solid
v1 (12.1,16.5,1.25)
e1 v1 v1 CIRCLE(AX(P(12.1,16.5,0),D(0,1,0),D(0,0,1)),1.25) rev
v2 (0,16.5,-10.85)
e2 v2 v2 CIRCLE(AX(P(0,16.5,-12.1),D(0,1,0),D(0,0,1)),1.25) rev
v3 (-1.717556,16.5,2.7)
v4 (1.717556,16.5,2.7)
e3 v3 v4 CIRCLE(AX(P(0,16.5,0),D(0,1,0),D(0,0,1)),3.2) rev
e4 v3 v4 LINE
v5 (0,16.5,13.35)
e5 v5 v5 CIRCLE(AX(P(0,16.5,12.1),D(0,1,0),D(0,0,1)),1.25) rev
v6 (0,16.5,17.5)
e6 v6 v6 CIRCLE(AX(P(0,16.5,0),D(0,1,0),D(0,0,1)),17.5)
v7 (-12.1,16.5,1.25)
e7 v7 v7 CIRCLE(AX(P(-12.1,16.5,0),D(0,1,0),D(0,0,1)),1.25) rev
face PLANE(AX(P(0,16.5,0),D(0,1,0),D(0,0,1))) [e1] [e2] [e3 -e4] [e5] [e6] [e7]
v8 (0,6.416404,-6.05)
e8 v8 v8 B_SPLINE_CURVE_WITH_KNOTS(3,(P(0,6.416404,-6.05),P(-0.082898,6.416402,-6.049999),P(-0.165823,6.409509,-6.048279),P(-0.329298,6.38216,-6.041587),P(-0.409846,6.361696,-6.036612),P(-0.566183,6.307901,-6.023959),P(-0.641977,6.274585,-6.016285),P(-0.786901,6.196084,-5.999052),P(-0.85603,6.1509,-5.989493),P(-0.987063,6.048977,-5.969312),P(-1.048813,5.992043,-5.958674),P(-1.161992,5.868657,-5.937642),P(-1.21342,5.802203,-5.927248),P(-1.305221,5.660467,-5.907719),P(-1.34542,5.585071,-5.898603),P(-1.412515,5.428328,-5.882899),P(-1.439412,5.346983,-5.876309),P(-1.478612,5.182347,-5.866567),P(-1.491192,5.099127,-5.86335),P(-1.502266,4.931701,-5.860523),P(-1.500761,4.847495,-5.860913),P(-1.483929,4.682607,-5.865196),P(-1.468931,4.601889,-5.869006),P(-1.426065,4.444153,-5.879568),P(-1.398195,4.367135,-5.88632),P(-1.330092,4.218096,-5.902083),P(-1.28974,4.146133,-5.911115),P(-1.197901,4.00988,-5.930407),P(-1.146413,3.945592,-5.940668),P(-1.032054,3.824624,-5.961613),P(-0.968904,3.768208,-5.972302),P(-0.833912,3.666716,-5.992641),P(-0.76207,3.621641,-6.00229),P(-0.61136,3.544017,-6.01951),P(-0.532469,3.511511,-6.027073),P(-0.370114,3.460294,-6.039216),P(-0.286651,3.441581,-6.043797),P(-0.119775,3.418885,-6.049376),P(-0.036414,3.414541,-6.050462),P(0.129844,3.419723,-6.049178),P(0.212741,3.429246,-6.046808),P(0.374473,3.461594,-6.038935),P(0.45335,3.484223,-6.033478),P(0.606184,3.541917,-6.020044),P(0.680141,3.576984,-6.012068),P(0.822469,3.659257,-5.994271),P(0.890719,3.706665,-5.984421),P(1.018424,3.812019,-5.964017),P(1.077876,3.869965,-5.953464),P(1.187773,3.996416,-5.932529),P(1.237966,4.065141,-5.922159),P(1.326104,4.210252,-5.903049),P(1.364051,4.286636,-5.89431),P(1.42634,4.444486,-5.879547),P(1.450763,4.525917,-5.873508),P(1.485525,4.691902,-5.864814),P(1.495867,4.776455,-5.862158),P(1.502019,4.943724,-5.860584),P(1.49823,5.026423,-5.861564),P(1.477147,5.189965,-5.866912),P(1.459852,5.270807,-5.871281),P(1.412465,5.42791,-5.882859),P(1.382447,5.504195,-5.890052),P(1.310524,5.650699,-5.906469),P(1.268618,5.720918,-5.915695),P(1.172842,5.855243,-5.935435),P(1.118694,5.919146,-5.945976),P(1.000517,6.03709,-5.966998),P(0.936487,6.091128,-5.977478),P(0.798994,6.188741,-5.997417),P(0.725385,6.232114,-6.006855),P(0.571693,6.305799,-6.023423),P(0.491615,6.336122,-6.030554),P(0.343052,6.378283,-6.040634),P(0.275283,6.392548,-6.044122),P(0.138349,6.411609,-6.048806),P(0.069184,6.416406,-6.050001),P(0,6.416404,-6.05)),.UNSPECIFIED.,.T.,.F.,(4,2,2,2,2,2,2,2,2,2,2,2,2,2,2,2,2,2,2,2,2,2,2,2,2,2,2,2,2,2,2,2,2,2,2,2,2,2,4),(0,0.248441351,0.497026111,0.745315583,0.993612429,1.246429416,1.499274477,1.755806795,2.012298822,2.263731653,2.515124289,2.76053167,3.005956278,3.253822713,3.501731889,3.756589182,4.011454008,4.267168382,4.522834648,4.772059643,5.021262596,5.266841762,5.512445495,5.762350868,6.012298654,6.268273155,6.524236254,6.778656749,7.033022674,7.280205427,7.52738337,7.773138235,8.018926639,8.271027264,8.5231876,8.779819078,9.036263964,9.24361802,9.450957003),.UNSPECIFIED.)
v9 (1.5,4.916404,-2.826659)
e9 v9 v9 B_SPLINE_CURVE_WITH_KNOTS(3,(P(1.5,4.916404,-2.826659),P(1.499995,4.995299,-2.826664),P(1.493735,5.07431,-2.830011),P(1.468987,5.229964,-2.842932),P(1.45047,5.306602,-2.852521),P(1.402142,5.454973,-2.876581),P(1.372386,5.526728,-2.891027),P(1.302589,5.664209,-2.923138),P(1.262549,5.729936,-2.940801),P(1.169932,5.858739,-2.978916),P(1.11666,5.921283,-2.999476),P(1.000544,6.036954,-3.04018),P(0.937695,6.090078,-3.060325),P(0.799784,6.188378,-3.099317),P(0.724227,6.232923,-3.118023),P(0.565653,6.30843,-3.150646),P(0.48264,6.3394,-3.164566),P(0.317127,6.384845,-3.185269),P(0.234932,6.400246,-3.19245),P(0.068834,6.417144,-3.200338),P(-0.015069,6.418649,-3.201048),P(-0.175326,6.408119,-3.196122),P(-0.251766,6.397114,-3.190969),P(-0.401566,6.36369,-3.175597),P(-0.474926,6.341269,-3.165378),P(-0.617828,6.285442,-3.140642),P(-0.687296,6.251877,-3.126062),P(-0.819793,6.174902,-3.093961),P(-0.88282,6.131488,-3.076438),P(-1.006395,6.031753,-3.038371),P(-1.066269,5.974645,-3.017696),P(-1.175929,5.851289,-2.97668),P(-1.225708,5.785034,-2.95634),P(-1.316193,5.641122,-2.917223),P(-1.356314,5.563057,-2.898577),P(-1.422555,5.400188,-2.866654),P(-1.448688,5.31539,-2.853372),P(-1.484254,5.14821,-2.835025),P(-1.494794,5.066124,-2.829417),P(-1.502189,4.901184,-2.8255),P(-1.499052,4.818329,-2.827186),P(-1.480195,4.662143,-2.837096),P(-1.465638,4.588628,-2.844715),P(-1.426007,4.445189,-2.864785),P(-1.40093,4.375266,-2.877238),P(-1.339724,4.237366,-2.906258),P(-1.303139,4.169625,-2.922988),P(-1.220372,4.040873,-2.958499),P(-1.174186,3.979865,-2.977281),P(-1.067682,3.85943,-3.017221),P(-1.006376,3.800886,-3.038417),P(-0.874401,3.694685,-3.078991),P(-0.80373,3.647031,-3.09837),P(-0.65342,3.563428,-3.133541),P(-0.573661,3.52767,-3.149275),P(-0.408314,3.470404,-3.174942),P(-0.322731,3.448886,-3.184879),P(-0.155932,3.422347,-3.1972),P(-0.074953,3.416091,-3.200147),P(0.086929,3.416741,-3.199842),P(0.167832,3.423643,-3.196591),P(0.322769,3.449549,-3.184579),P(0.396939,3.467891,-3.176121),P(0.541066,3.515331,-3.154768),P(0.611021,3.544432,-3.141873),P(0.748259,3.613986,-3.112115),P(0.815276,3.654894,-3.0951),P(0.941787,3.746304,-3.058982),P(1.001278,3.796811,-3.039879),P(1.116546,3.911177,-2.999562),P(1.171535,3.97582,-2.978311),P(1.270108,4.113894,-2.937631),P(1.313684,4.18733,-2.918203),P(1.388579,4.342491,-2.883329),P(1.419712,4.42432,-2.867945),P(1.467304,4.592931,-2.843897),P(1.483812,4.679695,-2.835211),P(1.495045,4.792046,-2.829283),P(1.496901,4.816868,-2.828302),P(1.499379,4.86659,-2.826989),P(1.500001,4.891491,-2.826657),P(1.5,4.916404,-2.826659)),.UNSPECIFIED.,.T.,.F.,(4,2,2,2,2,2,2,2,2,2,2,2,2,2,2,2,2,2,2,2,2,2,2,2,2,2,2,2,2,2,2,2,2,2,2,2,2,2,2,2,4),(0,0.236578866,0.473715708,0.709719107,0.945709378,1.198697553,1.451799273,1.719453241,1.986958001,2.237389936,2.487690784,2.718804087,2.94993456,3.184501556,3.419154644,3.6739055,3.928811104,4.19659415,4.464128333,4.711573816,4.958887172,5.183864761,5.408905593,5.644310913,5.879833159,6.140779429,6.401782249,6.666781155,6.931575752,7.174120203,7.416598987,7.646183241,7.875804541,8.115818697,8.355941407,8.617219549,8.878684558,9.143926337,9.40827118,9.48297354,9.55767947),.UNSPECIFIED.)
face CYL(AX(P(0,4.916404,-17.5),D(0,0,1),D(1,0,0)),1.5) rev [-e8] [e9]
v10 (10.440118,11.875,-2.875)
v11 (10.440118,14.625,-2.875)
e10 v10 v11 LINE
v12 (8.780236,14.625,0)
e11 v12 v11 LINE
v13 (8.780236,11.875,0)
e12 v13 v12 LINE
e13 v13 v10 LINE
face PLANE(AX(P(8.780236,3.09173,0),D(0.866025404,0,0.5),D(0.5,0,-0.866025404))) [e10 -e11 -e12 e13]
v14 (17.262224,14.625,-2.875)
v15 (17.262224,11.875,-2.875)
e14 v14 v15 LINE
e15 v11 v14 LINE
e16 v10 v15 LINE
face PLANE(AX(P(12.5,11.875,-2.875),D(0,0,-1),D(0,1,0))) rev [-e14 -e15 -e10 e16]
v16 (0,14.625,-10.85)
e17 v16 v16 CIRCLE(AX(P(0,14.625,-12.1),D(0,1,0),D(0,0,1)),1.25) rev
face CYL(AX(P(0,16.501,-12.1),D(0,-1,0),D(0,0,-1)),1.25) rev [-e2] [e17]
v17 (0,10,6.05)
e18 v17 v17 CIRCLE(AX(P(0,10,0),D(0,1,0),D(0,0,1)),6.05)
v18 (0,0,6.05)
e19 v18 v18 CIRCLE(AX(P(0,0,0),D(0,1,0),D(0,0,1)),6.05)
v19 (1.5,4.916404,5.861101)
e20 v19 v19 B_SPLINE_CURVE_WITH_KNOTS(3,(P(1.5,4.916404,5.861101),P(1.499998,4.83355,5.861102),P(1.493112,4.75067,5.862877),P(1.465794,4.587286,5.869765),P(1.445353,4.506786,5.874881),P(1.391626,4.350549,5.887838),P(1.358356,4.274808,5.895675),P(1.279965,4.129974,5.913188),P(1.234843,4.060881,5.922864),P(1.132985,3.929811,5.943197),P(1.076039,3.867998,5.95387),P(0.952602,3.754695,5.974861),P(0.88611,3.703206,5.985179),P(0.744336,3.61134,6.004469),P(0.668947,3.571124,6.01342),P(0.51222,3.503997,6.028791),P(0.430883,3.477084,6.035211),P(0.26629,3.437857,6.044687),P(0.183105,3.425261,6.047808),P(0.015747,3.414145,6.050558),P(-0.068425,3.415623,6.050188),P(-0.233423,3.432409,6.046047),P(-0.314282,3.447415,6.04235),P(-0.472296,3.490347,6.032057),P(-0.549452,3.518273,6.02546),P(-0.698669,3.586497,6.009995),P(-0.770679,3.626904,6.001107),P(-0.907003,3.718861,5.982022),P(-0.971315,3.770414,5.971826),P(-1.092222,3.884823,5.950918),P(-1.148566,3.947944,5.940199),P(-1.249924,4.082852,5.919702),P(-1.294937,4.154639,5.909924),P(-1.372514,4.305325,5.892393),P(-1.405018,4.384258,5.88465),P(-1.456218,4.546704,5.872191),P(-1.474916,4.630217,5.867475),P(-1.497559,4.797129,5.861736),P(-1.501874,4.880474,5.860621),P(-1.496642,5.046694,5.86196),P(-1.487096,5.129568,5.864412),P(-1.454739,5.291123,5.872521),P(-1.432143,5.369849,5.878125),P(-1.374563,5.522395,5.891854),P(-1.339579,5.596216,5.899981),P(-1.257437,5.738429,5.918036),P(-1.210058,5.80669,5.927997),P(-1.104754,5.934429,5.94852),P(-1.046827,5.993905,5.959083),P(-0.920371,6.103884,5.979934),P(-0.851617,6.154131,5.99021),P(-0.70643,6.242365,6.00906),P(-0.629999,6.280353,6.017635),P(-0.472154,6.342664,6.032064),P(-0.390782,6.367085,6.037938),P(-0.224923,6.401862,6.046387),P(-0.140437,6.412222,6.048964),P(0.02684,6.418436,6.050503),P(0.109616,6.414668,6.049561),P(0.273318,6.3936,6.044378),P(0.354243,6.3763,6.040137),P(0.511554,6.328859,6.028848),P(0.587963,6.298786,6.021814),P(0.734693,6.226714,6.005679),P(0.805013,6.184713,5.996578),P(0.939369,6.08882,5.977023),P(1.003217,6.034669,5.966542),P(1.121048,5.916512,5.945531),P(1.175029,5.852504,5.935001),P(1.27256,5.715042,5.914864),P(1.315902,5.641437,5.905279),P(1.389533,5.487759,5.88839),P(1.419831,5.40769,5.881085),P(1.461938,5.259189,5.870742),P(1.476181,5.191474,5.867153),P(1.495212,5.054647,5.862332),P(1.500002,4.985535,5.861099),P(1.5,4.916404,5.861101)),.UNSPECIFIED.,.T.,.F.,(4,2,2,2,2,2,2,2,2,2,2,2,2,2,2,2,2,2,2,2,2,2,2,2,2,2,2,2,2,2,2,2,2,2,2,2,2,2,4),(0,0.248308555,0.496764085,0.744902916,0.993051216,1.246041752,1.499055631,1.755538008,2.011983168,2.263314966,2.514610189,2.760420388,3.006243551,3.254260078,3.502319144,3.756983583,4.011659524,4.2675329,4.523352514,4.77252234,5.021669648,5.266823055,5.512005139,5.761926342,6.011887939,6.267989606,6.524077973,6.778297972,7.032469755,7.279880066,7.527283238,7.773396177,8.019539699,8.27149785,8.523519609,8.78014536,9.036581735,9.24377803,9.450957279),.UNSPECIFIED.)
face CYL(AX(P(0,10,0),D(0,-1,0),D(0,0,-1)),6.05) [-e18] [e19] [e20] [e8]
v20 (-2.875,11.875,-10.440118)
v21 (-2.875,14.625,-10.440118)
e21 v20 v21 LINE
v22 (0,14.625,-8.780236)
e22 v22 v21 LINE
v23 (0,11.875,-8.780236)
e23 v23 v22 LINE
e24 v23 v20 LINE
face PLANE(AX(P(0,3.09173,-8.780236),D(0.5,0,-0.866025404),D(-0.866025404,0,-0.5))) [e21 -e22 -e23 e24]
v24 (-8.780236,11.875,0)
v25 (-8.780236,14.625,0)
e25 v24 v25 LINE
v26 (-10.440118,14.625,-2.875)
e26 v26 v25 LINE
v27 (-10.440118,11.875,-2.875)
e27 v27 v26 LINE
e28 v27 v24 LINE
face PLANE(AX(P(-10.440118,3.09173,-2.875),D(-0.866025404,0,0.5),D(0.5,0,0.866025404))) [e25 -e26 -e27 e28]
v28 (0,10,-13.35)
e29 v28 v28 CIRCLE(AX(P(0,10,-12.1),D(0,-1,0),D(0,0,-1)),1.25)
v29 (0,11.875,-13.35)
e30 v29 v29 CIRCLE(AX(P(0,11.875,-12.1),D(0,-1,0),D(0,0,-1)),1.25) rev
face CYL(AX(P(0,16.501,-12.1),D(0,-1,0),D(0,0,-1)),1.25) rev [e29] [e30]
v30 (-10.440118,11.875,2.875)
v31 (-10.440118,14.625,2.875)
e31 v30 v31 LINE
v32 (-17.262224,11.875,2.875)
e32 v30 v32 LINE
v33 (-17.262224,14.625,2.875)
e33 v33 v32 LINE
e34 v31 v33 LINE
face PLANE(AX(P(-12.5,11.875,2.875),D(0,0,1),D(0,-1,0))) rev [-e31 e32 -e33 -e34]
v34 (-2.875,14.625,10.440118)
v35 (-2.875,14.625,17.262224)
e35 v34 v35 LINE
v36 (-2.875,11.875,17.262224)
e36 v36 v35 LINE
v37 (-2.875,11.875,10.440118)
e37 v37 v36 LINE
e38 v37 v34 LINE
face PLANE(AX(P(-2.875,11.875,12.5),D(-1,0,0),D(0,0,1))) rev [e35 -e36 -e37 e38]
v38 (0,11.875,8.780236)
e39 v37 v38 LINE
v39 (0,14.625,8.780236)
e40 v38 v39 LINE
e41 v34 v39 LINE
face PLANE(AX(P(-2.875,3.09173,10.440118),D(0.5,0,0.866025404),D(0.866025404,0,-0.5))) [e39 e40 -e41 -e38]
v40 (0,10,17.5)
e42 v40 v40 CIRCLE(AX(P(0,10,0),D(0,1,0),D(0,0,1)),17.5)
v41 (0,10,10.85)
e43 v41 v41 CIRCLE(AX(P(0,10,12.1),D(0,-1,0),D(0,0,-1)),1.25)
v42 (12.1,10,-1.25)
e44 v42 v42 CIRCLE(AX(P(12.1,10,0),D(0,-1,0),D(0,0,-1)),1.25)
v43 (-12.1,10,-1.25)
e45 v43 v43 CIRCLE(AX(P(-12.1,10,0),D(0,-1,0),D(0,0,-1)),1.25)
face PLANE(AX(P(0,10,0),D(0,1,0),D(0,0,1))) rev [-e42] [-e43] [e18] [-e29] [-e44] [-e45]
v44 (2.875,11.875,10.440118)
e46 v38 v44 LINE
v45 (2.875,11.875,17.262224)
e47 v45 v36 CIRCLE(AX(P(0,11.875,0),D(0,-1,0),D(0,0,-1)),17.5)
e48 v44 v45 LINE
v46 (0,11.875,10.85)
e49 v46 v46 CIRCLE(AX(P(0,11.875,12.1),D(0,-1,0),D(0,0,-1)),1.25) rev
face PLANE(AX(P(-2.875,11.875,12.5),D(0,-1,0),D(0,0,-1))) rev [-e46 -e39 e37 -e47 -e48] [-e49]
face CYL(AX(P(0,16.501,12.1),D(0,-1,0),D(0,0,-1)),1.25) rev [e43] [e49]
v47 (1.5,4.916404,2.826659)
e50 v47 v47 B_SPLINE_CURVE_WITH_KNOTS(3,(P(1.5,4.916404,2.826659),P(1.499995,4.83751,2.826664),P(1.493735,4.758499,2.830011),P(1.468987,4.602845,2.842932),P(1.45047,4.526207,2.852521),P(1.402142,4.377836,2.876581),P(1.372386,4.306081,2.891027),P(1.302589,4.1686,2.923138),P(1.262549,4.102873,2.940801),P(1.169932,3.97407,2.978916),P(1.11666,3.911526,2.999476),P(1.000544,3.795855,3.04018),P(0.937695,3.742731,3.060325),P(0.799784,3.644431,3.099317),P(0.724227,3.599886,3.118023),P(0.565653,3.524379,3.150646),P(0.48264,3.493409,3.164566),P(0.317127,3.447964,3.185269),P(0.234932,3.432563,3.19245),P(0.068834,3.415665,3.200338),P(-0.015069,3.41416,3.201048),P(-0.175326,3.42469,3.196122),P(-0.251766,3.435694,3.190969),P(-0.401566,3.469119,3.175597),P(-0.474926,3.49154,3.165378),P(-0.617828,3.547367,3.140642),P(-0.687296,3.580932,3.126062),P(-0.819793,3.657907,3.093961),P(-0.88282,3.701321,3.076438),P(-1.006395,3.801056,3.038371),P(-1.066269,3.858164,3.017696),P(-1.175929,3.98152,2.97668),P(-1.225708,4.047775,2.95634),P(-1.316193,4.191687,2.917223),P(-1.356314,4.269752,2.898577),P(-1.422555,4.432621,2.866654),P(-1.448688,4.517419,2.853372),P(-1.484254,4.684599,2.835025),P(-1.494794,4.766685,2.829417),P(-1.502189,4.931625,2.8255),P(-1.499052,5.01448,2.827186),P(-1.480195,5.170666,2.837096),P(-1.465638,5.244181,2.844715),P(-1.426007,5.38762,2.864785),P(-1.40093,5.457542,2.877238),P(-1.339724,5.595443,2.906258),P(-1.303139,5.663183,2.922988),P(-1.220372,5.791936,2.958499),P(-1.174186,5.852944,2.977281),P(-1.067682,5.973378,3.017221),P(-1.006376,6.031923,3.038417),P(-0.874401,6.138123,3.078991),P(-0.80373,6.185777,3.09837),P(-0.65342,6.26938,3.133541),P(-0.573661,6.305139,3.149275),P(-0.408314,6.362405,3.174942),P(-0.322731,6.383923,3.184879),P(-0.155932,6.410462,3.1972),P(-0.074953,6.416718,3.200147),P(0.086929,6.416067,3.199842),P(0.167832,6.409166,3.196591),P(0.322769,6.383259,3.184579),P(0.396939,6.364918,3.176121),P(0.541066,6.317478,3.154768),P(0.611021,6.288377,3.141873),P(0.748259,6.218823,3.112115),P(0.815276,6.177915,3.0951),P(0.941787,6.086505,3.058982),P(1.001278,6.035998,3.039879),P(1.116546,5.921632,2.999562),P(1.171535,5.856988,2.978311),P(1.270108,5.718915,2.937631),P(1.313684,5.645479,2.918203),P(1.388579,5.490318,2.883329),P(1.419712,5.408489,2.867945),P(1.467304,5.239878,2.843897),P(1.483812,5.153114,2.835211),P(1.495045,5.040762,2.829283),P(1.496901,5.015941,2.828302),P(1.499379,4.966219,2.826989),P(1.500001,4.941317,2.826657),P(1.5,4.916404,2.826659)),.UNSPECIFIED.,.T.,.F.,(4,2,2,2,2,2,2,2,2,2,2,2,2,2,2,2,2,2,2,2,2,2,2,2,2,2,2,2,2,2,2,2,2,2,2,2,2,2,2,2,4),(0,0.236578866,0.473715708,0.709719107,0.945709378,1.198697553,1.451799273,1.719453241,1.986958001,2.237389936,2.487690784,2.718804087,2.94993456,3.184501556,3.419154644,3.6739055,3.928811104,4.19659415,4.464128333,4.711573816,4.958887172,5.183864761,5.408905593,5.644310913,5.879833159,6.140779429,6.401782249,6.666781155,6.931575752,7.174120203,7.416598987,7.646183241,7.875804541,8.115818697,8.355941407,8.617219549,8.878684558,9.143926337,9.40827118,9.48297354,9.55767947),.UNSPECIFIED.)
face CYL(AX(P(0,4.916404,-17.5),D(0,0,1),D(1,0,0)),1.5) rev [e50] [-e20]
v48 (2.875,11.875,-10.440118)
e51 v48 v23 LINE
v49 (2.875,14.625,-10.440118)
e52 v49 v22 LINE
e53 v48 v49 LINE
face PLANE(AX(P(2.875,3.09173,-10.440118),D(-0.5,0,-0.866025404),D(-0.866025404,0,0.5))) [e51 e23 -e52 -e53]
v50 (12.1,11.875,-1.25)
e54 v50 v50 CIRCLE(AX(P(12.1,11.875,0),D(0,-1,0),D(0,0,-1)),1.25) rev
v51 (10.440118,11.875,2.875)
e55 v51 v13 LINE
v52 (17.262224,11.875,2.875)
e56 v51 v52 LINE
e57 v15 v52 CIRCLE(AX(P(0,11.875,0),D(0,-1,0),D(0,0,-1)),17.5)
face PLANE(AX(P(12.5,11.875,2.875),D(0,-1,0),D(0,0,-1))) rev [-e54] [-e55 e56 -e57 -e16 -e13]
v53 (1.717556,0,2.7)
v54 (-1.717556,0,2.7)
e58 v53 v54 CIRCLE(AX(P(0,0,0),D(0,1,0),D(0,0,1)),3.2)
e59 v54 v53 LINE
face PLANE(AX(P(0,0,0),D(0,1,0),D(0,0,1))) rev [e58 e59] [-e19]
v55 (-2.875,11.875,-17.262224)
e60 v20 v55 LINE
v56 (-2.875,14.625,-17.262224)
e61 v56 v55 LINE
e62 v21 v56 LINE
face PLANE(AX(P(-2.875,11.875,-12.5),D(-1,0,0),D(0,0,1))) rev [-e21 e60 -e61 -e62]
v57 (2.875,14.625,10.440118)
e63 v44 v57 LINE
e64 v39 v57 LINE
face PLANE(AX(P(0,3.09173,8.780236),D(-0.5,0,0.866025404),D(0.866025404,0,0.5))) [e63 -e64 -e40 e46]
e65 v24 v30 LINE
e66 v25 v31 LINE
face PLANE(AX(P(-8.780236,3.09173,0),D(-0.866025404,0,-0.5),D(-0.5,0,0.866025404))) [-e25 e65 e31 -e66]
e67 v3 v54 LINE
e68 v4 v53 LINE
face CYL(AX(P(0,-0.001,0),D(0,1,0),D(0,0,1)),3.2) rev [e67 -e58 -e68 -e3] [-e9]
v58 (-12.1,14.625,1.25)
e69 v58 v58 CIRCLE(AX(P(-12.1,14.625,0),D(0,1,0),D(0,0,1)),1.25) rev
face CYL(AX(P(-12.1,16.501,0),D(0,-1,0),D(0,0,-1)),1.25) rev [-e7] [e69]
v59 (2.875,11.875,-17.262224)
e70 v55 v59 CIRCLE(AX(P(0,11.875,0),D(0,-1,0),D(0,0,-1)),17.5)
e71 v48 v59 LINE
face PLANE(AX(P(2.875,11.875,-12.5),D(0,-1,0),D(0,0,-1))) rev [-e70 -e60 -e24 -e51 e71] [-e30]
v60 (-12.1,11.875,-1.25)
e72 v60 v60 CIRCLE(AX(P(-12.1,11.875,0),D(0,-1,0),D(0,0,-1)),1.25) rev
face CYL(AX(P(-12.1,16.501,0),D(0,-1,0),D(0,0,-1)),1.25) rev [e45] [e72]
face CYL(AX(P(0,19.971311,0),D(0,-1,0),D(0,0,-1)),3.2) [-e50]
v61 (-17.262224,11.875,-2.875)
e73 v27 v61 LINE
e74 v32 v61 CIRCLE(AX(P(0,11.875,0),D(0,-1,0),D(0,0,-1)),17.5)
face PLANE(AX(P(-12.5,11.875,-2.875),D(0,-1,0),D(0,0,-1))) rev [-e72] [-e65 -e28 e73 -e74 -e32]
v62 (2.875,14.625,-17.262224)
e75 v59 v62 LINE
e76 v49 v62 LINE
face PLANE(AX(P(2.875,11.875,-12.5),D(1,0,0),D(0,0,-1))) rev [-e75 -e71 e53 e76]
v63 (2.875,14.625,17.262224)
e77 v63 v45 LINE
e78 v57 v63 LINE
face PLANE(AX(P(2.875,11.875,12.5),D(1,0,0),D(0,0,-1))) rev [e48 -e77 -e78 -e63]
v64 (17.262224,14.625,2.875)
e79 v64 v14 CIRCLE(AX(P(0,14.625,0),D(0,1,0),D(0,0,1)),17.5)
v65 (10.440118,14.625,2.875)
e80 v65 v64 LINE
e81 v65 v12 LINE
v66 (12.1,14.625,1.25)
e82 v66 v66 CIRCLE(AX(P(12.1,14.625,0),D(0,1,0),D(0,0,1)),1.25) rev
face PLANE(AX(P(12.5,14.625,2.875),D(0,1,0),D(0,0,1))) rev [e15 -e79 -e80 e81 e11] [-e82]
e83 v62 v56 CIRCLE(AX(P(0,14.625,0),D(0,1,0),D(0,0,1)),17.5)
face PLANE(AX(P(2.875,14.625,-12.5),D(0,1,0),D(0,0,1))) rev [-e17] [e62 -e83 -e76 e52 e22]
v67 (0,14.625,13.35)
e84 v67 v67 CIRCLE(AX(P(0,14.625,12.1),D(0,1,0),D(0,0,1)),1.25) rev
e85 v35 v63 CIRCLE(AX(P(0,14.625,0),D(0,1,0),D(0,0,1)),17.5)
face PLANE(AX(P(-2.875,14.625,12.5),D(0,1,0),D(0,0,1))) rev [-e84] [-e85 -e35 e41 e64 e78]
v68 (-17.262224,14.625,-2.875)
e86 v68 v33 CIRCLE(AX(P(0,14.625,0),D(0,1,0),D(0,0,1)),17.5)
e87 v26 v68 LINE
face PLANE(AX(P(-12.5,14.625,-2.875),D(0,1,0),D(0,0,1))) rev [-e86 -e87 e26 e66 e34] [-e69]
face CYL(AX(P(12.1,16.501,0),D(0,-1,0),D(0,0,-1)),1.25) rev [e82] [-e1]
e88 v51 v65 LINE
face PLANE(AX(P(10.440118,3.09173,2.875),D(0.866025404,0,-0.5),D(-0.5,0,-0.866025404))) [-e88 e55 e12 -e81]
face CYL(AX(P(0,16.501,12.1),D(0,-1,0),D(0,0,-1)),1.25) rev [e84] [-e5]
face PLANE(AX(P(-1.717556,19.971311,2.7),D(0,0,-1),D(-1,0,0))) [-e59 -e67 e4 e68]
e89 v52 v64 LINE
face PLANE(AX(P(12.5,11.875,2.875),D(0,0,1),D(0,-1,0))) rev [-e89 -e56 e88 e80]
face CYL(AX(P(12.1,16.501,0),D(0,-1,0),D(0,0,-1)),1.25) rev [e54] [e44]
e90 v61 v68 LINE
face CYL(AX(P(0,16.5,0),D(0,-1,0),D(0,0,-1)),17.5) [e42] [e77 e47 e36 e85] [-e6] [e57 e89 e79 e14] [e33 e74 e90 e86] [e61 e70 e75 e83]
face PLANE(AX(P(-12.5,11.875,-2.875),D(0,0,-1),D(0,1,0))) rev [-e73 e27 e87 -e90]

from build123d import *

# Parameters (mm, degrees)
SKETCH1_R                      = 6.05
SKETCH1_R_2                    = 3.05
BOSS_EXTRUDE1_DEPTH            = 10
SKETCH2_R                      = 17.5
BOSS_EXTRUDE2_DEPTH            = 6.5
CUT_EXTRUDE1_REACH             = 28.693
SKETCH3_R                      = 1.25
CUT_EXTRUDE2_DEPTH             = 30.744747435
CUT_EXTRUDE2_DEPTH_BACK        = 30.744747435
SKETCH4_R                      = 1.5
CUT_EXTRUDE3_REACH             = 28.693
SKETCH6_R                      = 3.2
CUT_EXTRUDE3_DIRECTION_2_REACH = 28.693
BOSS_EXTRUDE3_DEPTH            = 16.5
SKETCH8_W                      = 5.75
SKETCH8_H                      = 2.75
CUT_EXTRUDE4_DEPTH             = 5
CUT_EXTRUDE5_DEPTH             = 2.75
CIRPATTERN1_START              = 11.875
CIRPATTERN1_OUTLINE_R          = 1.25
CIRPATTERN1_DEPTH              = 2.75


# Read off the part's stored shape, not the designer's step: CirPattern1
with BuildPart() as part:
    # Sketch1 → Boss-Extrude1 (new body)
    with BuildSketch(Plane(origin=(0, 0, 0), x_dir=(1, 0, 0), z_dir=(0, 1, 0))):
        with Locations(Location((0, 0, 0), (0, 0, 270))):
            Circle(SKETCH1_R)
        with Locations(Location((0, 0, 0), (0, 0, 270))):
            Circle(SKETCH1_R_2, mode=Mode.SUBTRACT)
    extrude(amount=BOSS_EXTRUDE1_DEPTH)

    # Sketch2 → Boss-Extrude2 (add)
    with BuildSketch(Plane(origin=(0, 10, 0), x_dir=(1, 0, 0), z_dir=(0, 1, 0))):
        with Locations(Location((0, 0, 0), (0, 0, 90))):
            Circle(SKETCH2_R)
    extrude(amount=BOSS_EXTRUDE2_DEPTH)

    # Sketch3 → Cut-Extrude1 (cut, up to next)
    with BuildSketch(Plane.XZ.offset(-10), mode=Mode.PRIVATE) as cut_extrude1_sk1:
        with Locations(Location((12.1, 0, 0), (0, 0, 270))):
            Circle(SKETCH3_R)
    cut_extrude1_tool1 = extrude(cut_extrude1_sk1.sketch, amount=-CUT_EXTRUDE1_REACH, mode=Mode.PRIVATE) & part.part
    # Sketch3 → Cut-Extrude1 (cut, up to next)
    with BuildSketch(Plane.XZ.offset(-10), mode=Mode.PRIVATE) as cut_extrude1_sk2:
        with Locations(Location((0, -12.1, 0), (0, 0, 270))):
            Circle(SKETCH3_R)
    cut_extrude1_tool2 = extrude(cut_extrude1_sk2.sketch, amount=-CUT_EXTRUDE1_REACH, mode=Mode.PRIVATE) & part.part
    # Sketch3 → Cut-Extrude1 (cut, up to next)
    with BuildSketch(Plane.XZ.offset(-10), mode=Mode.PRIVATE) as cut_extrude1_sk3:
        with Locations(Location((-12.1, 0, 0), (0, 0, 270))):
            Circle(SKETCH3_R)
    cut_extrude1_tool3 = extrude(cut_extrude1_sk3.sketch, amount=-CUT_EXTRUDE1_REACH, mode=Mode.PRIVATE) & part.part
    # Sketch3 → Cut-Extrude1 (cut, up to next)
    with BuildSketch(Plane.XZ.offset(-10), mode=Mode.PRIVATE) as cut_extrude1_sk4:
        with Locations(Location((0, 12.1, 0), (0, 0, 270))):
            Circle(SKETCH3_R)
    cut_extrude1_tool4 = extrude(cut_extrude1_sk4.sketch, amount=-CUT_EXTRUDE1_REACH, mode=Mode.PRIVATE) & part.part
    add(cut_extrude1_tool1.solids().sort_by_distance((12.1, 10, 0))[0], mode=Mode.SUBTRACT)
    add(cut_extrude1_tool2.solids().sort_by_distance((0, 10, -12.1))[0], mode=Mode.SUBTRACT)
    add(cut_extrude1_tool3.solids().sort_by_distance((-12.1, 10, 0))[0], mode=Mode.SUBTRACT)
    add(cut_extrude1_tool4.solids().sort_by_distance((0, 10, 12.1))[0], mode=Mode.SUBTRACT)

    # Sketch4 → Cut-Extrude2 (cut, two sides: drawn at the far end of the back side and taken through both)
    with BuildSketch(Plane.XY.offset(-CUT_EXTRUDE2_DEPTH_BACK)):
        with Locations((0, 4.916404418)):
            Circle(SKETCH4_R)
    extrude(amount=CUT_EXTRUDE2_DEPTH + CUT_EXTRUDE2_DEPTH_BACK, mode=Mode.SUBTRACT)

    # Sketch6 → Cut-Extrude3 (cut, up to next)
    with BuildSketch(Plane(origin=(0, 10, 0), x_dir=(-1, 0, 0), z_dir=(0, -1, 0)), mode=Mode.PRIVATE) as cut_extrude3_sk1:
        with Locations(Location((0, 0, 0), (0, 0, 270))):
            Circle(SKETCH6_R)
    cut_extrude3_tool1 = extrude(cut_extrude3_sk1.sketch, amount=-CUT_EXTRUDE3_REACH, mode=Mode.PRIVATE) & part.part
    add(cut_extrude3_tool1.solids().sort_by_distance((0, 10, 0))[0], mode=Mode.SUBTRACT)

    # Sketch6 → Cut-Extrude3 direction 2 (cut, up to next)
    with BuildSketch(Plane(origin=(0, 10, 0), x_dir=(-1, 0, 0), z_dir=(0, -1, 0)), mode=Mode.PRIVATE) as cut_extrude3_direction_2_sk1:
        with Locations(Location((0, 0, 0), (0, 0, 270))):
            Circle(SKETCH6_R)
    cut_extrude3_direction_2_tool1 = extrude(cut_extrude3_direction_2_sk1.sketch, amount=CUT_EXTRUDE3_DIRECTION_2_REACH, mode=Mode.PRIVATE) & part.part
    add(cut_extrude3_direction_2_tool1.solids().sort_by_distance((0, 10, 0))[0], mode=Mode.SUBTRACT)

    # Sketch7 → Boss-Extrude3 (add)
    with BuildSketch(Plane.XZ):
        with BuildLine():
            Line((-1.717556404, 2.7), (1.717556404, 2.7))
            ThreePointArc((1.717556404, 2.7), (0, 3.2), (-1.717556404, 2.7))
        make_face()
    extrude(amount=-BOSS_EXTRUDE3_DEPTH)

    # Sketch8 → Cut-Extrude4 (cut)
    with BuildSketch(Plane(origin=(17.5, 0, 0), x_dir=(0, 0, -1), z_dir=(1, 0, 0))):
        with Locations((0, 13.25)):
            Rectangle(SKETCH8_W, SKETCH8_H)
    extrude(amount=-CUT_EXTRUDE4_DEPTH, mode=Mode.SUBTRACT)

    # Sketch9 → Cut-Extrude5 (cut)
    with BuildSketch(Plane.XZ.offset(-14.625)):
        Polygon((15.419764048, 0), (13.759882024, 2.875), (10.440117976, 2.875), (8.780235952, 0), (10.440117976, -2.875), (13.759882024, -2.875), align=None)
    extrude(amount=CUT_EXTRUDE5_DEPTH, mode=Mode.SUBTRACT)

    # CirPattern1 outline → CirPattern1 (cut)
    # profile 1 of 3: a face of its own
    with BuildSketch(Plane(origin=(0, 0, 0), x_dir=(1, 0, 0), z_dir=(0, 1, 0)).offset(CIRPATTERN1_START)):
        with BuildLine():
            Line((-8.780235952, 0), (-10.440117976, 2.875))
            Line((-10.440117976, 2.875), (-17.26222393, 2.875))
            ThreePointArc((-17.26222393, 2.875), (-17.5, 0), (-17.26222393, -2.875))
            Line((-17.26222393, -2.875), (-10.440117976, -2.875))
            Line((-10.440117976, -2.875), (-8.780235952, 0))
        make_face()
        with Locations((-12.1, 0)):
            Circle(CIRPATTERN1_OUTLINE_R, mode=Mode.SUBTRACT)
    # profile 2 of 3: a face of its own
    with BuildSketch(Plane(origin=(0, 0, 0), x_dir=(1, 0, 0), z_dir=(0, 1, 0)).offset(CIRPATTERN1_START)):
        with BuildLine():
            ThreePointArc((2.875, 17.26222393), (0, 17.5), (-2.875, 17.26222393))
            Line((-2.875, 17.26222393), (-2.875, 10.440117976))
            Line((-2.875, 10.440117976), (0, 8.780235952))
            Line((0, 8.780235952), (2.875, 10.440117976))
            Line((2.875, 10.440117976), (2.875, 17.26222393))
        make_face()
        with Locations((0, 12.1)):
            Circle(CIRPATTERN1_OUTLINE_R, mode=Mode.SUBTRACT)
    # profile 3 of 3: a face of its own
    with BuildSketch(Plane(origin=(0, 0, 0), x_dir=(1, 0, 0), z_dir=(0, 1, 0)).offset(CIRPATTERN1_START)):
        with BuildLine():
            Line((-2.875, -10.440117976), (-2.875, -17.26222393))
            ThreePointArc((-2.875, -17.26222393), (0, -17.5), (2.875, -17.26222393))
            Line((2.875, -17.26222393), (2.875, -10.440117976))
            Line((2.875, -10.440117976), (0, -8.780235952))
            Line((0, -8.780235952), (-2.875, -10.440117976))
        make_face()
        with Locations((0, -12.1)):
            Circle(CIRPATTERN1_OUTLINE_R, mode=Mode.SUBTRACT)
    extrude(amount=CIRPATTERN1_DEPTH, mode=Mode.SUBTRACT)


solid = part.part
